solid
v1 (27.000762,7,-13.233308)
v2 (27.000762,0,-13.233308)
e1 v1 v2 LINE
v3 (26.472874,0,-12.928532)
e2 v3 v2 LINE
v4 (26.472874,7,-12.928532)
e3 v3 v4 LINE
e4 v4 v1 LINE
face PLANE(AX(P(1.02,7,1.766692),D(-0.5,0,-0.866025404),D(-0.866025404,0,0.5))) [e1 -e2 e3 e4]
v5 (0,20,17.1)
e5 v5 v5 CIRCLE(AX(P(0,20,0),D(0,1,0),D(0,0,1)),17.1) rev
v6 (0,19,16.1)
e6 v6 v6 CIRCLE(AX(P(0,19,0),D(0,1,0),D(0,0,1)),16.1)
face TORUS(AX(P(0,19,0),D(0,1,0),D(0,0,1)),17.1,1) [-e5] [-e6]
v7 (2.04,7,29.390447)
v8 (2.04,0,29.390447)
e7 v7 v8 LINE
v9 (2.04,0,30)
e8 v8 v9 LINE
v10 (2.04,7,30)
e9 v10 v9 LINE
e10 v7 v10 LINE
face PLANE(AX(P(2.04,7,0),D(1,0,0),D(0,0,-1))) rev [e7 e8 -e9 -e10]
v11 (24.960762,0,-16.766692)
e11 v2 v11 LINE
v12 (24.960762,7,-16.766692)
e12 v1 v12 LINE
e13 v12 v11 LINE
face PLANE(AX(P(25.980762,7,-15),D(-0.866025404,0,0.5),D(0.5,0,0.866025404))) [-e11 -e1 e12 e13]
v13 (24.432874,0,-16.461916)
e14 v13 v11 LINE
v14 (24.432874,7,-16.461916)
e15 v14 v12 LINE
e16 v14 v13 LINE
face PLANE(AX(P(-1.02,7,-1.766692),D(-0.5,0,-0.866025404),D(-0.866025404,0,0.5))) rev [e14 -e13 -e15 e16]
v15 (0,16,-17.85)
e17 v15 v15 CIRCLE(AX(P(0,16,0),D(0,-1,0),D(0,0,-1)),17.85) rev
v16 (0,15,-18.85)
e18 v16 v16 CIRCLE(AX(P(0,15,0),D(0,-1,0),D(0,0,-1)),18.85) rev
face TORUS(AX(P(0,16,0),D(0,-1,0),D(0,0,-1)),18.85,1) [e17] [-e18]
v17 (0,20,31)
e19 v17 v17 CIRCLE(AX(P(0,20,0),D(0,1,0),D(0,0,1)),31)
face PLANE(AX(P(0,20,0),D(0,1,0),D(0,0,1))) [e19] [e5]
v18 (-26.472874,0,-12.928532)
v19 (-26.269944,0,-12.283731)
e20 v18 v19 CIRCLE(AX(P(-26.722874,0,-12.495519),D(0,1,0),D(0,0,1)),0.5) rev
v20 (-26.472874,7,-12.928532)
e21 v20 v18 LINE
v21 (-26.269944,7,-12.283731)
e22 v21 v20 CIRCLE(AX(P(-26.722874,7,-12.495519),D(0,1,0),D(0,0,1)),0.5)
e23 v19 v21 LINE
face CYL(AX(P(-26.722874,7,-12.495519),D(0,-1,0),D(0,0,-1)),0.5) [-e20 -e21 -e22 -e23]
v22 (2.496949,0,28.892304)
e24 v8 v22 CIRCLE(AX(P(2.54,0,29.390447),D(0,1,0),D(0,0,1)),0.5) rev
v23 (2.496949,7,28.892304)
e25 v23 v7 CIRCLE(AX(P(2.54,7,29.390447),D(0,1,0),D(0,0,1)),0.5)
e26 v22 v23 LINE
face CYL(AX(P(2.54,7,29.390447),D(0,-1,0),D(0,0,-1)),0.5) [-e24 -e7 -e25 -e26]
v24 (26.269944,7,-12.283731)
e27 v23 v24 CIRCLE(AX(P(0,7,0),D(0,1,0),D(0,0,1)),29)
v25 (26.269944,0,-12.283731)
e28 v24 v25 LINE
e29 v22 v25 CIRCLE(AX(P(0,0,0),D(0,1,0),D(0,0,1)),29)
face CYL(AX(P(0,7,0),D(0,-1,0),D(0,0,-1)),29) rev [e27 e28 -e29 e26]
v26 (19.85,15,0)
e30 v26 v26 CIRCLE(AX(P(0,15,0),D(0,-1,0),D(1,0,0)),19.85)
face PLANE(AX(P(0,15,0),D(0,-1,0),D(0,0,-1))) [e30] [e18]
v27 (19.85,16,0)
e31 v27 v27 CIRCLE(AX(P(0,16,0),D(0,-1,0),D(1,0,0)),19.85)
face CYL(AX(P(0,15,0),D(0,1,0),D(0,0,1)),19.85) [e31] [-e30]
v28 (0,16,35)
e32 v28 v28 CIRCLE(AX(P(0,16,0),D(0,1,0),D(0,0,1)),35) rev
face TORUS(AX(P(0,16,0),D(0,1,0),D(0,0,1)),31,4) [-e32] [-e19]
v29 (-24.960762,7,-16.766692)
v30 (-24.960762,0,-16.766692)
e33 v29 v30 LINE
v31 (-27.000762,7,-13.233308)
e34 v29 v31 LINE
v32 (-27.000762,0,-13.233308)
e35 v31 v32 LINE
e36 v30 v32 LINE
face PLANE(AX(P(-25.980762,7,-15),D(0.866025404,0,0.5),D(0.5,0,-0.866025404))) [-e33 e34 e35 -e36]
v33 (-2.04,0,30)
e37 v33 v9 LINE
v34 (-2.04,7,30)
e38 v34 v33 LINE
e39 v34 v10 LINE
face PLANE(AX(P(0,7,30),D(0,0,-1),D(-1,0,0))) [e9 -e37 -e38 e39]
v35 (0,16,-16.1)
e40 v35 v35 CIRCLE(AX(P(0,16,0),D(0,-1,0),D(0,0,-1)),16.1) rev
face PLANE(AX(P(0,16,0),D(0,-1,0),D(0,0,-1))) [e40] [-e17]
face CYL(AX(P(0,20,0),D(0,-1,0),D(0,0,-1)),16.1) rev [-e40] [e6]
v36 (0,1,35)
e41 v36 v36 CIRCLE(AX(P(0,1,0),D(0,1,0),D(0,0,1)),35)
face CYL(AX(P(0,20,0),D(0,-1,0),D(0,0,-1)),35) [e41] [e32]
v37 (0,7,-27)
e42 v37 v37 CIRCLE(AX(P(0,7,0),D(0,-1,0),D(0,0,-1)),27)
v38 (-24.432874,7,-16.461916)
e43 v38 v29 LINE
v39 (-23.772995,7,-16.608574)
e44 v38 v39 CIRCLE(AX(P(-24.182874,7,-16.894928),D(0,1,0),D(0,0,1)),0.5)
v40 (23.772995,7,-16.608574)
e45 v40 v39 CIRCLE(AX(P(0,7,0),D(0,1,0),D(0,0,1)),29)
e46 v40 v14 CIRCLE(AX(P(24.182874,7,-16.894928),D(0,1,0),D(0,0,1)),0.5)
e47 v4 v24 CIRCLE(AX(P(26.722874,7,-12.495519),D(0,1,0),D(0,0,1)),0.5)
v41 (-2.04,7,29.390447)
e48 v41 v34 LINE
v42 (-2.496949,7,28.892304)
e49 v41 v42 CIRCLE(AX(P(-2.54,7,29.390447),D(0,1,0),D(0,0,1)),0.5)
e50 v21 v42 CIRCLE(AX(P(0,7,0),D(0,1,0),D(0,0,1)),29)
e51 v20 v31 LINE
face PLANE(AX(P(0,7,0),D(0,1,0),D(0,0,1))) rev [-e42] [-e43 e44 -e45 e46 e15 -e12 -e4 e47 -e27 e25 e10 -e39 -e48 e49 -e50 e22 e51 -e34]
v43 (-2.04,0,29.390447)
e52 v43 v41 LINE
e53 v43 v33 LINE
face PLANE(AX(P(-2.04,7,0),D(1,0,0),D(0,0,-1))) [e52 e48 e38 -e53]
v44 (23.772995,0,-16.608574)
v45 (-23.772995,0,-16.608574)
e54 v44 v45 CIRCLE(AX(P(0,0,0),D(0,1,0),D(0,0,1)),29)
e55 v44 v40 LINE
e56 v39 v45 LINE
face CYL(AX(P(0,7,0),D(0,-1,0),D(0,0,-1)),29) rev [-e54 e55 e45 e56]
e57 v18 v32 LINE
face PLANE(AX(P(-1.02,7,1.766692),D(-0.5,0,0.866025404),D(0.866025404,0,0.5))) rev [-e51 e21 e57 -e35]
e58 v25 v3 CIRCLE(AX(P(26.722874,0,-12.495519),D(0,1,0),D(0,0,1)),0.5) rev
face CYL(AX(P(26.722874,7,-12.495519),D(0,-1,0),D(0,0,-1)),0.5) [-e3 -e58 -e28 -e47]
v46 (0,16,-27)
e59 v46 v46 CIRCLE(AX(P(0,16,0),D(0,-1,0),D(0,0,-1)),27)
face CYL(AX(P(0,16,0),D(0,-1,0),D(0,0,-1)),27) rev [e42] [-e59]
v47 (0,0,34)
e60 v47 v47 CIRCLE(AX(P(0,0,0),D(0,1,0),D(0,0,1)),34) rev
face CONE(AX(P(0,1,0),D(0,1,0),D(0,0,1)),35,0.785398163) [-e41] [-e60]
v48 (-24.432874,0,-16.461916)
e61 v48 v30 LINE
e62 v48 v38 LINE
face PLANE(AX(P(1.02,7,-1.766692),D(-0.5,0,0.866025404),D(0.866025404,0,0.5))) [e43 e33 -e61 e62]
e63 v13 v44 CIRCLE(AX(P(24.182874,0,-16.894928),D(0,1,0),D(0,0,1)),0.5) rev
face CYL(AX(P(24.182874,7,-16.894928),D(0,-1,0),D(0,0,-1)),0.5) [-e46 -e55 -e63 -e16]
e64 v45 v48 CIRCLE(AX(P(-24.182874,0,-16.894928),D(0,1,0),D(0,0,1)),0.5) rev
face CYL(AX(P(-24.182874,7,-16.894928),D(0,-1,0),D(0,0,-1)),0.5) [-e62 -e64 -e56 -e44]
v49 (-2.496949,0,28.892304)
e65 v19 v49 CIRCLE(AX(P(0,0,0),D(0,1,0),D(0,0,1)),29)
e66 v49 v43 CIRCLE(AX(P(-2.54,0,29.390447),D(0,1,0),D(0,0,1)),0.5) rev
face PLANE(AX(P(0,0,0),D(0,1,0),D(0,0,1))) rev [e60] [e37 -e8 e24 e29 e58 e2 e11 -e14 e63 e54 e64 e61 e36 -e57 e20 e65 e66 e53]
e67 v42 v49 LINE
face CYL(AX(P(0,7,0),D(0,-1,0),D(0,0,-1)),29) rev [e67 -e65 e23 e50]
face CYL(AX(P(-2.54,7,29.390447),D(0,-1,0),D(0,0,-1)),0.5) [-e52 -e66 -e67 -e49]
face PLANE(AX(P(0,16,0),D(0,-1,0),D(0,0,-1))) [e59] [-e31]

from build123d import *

# Parameters (mm, degrees)
SKETCH7_R            = 35
BOSS_EXTRUDE6_DEPTH  = 20
SKETCH6_R            = 16.1
DISPLAY_CUTOUT_DEPTH = 54.38539126
SKETCH1_R            = 16.1
CUT_EXTRUDE6_DEPTH   = 7
FILLET2_R            = 4
FILLET3_R            = 1
SKETCH8_R            = 27
CUT_EXTRUDE7_DEPTH   = 9
CHAMFER1_SIZE        = 1
FILLET4_R            = 0.5
SKETCH9_R            = 19.85
SKETCH9_R_2          = 17.85
EXTRUDE_THIN1_DEPTH  = 1
FILLET5_R            = 1


with BuildPart() as part:
    # Sketch7 → Boss-Extrude6 (new body)
    with BuildSketch(Plane(origin=(0, 0, 0), x_dir=(1, 0, 0), z_dir=(0, 1, 0))):
        with Locations(Location((0, 0, 0), (0, 0, 270))):
            Circle(SKETCH7_R)
    extrude(amount=BOSS_EXTRUDE6_DEPTH)

    # Sketch6 → Display cutout (cut, through all)
    with BuildSketch(Plane(origin=(0, 0, 0), x_dir=(1, 0, 0), z_dir=(0, 1, 0))):
        with Locations(Location((0, 0, 0), (0, 0, 270))):
            Circle(SKETCH6_R)
    extrude(amount=DISPLAY_CUTOUT_DEPTH, mode=Mode.SUBTRACT)

    # Sketch1 → Cut-Extrude6 (cut)
    with BuildSketch(Plane(origin=(0, 0, 0), x_dir=(1, 0, 0), z_dir=(0, 1, 0))):
        with BuildLine():
            Line((2.04, -30), (2.04, -28.928159292))
            ThreePointArc((2.04, -28.928159292), (25.11473671, -14.5), (26.072520831, 12.697387822))
            Line((26.072520831, 12.697387822), (27.000762114, 13.233308176))
            Line((27.000762114, 13.233308176), (24.960762114, 16.766691824))
            Line((24.960762114, 16.766691824), (24.032520831, 16.23077147))
            ThreePointArc((24.032520831, 16.23077147), (0, 29), (-24.032520831, 16.23077147))
            Line((-24.032520831, 16.23077147), (-24.960762114, 16.766691824))
            Line((-24.960762114, 16.766691824), (-27.000762114, 13.233308176))
            Line((-27.000762114, 13.233308176), (-26.072520831, 12.697387822))
            ThreePointArc((-26.072520831, 12.697387822), (-25.11473671, -14.5), (-2.04, -28.928159292))
            Line((-2.04, -28.928159292), (-2.04, -30))
            Line((-2.04, -30), (2.04, -30))
        make_face()
        with Locations(Location((0, 0, 0), (0, 0, 270))):
            Circle(SKETCH1_R, mode=Mode.SUBTRACT)
    extrude(amount=CUT_EXTRUDE6_DEPTH, mode=Mode.SUBTRACT)

    # Fillet2
    fillet2_edges = [part.edges().sort_by_distance(p)[0] for p in [
        (0, 20, -35),
    ]]
    fillet(fillet2_edges, radius=FILLET2_R)

    # Fillet3
    fillet3_edges = [part.edges().sort_by_distance(p)[0] for p in [
        (0, 20, -16.1),
    ]]
    fillet(fillet3_edges, radius=FILLET3_R)

    # Sketch8 → Cut-Extrude7 (cut)
    with BuildSketch(Plane.XZ.offset(-7)):
        with Locations(Location((0, 0, 0), (0, 0, 270))):
            Circle(SKETCH8_R)
    extrude(amount=-CUT_EXTRUDE7_DEPTH, mode=Mode.SUBTRACT)

    # Chamfer1
    chamfer1_edges = [part.edges().sort_by_distance(p)[0] for p in [
        (0, 0, -35),
    ]]
    chamfer(chamfer1_edges, length=CHAMFER1_SIZE)

    # Fillet4
    fillet4_edges = [part.edges().sort_by_distance(p)[0] for p in [
        (2.04, 3.5, 28.928159292),
        (24.032520831, 3.5, -16.23077147),
        (-26.072520831, 3.5, -12.697387822),
        (-2.04, 3.5, 28.928159292),
        (-24.032520831, 3.5, -16.23077147),
        (26.072520831, 3.5, -12.697387822),
    ]]
    fillet(fillet4_edges, radius=FILLET4_R)

    # Sketch9 → Extrude-Thin1 (add)
    with BuildSketch(Plane.XZ.offset(-16)):
        Circle(SKETCH9_R)
        Circle(SKETCH9_R_2, mode=Mode.SUBTRACT)
    extrude(amount=EXTRUDE_THIN1_DEPTH)

    # Fillet5
    fillet5_edges = [part.edges().sort_by_distance(p)[0] for p in [
        (-17.85, 15, 0),
    ]]
    fillet(fillet5_edges, radius=FILLET5_R - 0.0001)  # a hair under: the kernel refuses the full size


solid = part.part
